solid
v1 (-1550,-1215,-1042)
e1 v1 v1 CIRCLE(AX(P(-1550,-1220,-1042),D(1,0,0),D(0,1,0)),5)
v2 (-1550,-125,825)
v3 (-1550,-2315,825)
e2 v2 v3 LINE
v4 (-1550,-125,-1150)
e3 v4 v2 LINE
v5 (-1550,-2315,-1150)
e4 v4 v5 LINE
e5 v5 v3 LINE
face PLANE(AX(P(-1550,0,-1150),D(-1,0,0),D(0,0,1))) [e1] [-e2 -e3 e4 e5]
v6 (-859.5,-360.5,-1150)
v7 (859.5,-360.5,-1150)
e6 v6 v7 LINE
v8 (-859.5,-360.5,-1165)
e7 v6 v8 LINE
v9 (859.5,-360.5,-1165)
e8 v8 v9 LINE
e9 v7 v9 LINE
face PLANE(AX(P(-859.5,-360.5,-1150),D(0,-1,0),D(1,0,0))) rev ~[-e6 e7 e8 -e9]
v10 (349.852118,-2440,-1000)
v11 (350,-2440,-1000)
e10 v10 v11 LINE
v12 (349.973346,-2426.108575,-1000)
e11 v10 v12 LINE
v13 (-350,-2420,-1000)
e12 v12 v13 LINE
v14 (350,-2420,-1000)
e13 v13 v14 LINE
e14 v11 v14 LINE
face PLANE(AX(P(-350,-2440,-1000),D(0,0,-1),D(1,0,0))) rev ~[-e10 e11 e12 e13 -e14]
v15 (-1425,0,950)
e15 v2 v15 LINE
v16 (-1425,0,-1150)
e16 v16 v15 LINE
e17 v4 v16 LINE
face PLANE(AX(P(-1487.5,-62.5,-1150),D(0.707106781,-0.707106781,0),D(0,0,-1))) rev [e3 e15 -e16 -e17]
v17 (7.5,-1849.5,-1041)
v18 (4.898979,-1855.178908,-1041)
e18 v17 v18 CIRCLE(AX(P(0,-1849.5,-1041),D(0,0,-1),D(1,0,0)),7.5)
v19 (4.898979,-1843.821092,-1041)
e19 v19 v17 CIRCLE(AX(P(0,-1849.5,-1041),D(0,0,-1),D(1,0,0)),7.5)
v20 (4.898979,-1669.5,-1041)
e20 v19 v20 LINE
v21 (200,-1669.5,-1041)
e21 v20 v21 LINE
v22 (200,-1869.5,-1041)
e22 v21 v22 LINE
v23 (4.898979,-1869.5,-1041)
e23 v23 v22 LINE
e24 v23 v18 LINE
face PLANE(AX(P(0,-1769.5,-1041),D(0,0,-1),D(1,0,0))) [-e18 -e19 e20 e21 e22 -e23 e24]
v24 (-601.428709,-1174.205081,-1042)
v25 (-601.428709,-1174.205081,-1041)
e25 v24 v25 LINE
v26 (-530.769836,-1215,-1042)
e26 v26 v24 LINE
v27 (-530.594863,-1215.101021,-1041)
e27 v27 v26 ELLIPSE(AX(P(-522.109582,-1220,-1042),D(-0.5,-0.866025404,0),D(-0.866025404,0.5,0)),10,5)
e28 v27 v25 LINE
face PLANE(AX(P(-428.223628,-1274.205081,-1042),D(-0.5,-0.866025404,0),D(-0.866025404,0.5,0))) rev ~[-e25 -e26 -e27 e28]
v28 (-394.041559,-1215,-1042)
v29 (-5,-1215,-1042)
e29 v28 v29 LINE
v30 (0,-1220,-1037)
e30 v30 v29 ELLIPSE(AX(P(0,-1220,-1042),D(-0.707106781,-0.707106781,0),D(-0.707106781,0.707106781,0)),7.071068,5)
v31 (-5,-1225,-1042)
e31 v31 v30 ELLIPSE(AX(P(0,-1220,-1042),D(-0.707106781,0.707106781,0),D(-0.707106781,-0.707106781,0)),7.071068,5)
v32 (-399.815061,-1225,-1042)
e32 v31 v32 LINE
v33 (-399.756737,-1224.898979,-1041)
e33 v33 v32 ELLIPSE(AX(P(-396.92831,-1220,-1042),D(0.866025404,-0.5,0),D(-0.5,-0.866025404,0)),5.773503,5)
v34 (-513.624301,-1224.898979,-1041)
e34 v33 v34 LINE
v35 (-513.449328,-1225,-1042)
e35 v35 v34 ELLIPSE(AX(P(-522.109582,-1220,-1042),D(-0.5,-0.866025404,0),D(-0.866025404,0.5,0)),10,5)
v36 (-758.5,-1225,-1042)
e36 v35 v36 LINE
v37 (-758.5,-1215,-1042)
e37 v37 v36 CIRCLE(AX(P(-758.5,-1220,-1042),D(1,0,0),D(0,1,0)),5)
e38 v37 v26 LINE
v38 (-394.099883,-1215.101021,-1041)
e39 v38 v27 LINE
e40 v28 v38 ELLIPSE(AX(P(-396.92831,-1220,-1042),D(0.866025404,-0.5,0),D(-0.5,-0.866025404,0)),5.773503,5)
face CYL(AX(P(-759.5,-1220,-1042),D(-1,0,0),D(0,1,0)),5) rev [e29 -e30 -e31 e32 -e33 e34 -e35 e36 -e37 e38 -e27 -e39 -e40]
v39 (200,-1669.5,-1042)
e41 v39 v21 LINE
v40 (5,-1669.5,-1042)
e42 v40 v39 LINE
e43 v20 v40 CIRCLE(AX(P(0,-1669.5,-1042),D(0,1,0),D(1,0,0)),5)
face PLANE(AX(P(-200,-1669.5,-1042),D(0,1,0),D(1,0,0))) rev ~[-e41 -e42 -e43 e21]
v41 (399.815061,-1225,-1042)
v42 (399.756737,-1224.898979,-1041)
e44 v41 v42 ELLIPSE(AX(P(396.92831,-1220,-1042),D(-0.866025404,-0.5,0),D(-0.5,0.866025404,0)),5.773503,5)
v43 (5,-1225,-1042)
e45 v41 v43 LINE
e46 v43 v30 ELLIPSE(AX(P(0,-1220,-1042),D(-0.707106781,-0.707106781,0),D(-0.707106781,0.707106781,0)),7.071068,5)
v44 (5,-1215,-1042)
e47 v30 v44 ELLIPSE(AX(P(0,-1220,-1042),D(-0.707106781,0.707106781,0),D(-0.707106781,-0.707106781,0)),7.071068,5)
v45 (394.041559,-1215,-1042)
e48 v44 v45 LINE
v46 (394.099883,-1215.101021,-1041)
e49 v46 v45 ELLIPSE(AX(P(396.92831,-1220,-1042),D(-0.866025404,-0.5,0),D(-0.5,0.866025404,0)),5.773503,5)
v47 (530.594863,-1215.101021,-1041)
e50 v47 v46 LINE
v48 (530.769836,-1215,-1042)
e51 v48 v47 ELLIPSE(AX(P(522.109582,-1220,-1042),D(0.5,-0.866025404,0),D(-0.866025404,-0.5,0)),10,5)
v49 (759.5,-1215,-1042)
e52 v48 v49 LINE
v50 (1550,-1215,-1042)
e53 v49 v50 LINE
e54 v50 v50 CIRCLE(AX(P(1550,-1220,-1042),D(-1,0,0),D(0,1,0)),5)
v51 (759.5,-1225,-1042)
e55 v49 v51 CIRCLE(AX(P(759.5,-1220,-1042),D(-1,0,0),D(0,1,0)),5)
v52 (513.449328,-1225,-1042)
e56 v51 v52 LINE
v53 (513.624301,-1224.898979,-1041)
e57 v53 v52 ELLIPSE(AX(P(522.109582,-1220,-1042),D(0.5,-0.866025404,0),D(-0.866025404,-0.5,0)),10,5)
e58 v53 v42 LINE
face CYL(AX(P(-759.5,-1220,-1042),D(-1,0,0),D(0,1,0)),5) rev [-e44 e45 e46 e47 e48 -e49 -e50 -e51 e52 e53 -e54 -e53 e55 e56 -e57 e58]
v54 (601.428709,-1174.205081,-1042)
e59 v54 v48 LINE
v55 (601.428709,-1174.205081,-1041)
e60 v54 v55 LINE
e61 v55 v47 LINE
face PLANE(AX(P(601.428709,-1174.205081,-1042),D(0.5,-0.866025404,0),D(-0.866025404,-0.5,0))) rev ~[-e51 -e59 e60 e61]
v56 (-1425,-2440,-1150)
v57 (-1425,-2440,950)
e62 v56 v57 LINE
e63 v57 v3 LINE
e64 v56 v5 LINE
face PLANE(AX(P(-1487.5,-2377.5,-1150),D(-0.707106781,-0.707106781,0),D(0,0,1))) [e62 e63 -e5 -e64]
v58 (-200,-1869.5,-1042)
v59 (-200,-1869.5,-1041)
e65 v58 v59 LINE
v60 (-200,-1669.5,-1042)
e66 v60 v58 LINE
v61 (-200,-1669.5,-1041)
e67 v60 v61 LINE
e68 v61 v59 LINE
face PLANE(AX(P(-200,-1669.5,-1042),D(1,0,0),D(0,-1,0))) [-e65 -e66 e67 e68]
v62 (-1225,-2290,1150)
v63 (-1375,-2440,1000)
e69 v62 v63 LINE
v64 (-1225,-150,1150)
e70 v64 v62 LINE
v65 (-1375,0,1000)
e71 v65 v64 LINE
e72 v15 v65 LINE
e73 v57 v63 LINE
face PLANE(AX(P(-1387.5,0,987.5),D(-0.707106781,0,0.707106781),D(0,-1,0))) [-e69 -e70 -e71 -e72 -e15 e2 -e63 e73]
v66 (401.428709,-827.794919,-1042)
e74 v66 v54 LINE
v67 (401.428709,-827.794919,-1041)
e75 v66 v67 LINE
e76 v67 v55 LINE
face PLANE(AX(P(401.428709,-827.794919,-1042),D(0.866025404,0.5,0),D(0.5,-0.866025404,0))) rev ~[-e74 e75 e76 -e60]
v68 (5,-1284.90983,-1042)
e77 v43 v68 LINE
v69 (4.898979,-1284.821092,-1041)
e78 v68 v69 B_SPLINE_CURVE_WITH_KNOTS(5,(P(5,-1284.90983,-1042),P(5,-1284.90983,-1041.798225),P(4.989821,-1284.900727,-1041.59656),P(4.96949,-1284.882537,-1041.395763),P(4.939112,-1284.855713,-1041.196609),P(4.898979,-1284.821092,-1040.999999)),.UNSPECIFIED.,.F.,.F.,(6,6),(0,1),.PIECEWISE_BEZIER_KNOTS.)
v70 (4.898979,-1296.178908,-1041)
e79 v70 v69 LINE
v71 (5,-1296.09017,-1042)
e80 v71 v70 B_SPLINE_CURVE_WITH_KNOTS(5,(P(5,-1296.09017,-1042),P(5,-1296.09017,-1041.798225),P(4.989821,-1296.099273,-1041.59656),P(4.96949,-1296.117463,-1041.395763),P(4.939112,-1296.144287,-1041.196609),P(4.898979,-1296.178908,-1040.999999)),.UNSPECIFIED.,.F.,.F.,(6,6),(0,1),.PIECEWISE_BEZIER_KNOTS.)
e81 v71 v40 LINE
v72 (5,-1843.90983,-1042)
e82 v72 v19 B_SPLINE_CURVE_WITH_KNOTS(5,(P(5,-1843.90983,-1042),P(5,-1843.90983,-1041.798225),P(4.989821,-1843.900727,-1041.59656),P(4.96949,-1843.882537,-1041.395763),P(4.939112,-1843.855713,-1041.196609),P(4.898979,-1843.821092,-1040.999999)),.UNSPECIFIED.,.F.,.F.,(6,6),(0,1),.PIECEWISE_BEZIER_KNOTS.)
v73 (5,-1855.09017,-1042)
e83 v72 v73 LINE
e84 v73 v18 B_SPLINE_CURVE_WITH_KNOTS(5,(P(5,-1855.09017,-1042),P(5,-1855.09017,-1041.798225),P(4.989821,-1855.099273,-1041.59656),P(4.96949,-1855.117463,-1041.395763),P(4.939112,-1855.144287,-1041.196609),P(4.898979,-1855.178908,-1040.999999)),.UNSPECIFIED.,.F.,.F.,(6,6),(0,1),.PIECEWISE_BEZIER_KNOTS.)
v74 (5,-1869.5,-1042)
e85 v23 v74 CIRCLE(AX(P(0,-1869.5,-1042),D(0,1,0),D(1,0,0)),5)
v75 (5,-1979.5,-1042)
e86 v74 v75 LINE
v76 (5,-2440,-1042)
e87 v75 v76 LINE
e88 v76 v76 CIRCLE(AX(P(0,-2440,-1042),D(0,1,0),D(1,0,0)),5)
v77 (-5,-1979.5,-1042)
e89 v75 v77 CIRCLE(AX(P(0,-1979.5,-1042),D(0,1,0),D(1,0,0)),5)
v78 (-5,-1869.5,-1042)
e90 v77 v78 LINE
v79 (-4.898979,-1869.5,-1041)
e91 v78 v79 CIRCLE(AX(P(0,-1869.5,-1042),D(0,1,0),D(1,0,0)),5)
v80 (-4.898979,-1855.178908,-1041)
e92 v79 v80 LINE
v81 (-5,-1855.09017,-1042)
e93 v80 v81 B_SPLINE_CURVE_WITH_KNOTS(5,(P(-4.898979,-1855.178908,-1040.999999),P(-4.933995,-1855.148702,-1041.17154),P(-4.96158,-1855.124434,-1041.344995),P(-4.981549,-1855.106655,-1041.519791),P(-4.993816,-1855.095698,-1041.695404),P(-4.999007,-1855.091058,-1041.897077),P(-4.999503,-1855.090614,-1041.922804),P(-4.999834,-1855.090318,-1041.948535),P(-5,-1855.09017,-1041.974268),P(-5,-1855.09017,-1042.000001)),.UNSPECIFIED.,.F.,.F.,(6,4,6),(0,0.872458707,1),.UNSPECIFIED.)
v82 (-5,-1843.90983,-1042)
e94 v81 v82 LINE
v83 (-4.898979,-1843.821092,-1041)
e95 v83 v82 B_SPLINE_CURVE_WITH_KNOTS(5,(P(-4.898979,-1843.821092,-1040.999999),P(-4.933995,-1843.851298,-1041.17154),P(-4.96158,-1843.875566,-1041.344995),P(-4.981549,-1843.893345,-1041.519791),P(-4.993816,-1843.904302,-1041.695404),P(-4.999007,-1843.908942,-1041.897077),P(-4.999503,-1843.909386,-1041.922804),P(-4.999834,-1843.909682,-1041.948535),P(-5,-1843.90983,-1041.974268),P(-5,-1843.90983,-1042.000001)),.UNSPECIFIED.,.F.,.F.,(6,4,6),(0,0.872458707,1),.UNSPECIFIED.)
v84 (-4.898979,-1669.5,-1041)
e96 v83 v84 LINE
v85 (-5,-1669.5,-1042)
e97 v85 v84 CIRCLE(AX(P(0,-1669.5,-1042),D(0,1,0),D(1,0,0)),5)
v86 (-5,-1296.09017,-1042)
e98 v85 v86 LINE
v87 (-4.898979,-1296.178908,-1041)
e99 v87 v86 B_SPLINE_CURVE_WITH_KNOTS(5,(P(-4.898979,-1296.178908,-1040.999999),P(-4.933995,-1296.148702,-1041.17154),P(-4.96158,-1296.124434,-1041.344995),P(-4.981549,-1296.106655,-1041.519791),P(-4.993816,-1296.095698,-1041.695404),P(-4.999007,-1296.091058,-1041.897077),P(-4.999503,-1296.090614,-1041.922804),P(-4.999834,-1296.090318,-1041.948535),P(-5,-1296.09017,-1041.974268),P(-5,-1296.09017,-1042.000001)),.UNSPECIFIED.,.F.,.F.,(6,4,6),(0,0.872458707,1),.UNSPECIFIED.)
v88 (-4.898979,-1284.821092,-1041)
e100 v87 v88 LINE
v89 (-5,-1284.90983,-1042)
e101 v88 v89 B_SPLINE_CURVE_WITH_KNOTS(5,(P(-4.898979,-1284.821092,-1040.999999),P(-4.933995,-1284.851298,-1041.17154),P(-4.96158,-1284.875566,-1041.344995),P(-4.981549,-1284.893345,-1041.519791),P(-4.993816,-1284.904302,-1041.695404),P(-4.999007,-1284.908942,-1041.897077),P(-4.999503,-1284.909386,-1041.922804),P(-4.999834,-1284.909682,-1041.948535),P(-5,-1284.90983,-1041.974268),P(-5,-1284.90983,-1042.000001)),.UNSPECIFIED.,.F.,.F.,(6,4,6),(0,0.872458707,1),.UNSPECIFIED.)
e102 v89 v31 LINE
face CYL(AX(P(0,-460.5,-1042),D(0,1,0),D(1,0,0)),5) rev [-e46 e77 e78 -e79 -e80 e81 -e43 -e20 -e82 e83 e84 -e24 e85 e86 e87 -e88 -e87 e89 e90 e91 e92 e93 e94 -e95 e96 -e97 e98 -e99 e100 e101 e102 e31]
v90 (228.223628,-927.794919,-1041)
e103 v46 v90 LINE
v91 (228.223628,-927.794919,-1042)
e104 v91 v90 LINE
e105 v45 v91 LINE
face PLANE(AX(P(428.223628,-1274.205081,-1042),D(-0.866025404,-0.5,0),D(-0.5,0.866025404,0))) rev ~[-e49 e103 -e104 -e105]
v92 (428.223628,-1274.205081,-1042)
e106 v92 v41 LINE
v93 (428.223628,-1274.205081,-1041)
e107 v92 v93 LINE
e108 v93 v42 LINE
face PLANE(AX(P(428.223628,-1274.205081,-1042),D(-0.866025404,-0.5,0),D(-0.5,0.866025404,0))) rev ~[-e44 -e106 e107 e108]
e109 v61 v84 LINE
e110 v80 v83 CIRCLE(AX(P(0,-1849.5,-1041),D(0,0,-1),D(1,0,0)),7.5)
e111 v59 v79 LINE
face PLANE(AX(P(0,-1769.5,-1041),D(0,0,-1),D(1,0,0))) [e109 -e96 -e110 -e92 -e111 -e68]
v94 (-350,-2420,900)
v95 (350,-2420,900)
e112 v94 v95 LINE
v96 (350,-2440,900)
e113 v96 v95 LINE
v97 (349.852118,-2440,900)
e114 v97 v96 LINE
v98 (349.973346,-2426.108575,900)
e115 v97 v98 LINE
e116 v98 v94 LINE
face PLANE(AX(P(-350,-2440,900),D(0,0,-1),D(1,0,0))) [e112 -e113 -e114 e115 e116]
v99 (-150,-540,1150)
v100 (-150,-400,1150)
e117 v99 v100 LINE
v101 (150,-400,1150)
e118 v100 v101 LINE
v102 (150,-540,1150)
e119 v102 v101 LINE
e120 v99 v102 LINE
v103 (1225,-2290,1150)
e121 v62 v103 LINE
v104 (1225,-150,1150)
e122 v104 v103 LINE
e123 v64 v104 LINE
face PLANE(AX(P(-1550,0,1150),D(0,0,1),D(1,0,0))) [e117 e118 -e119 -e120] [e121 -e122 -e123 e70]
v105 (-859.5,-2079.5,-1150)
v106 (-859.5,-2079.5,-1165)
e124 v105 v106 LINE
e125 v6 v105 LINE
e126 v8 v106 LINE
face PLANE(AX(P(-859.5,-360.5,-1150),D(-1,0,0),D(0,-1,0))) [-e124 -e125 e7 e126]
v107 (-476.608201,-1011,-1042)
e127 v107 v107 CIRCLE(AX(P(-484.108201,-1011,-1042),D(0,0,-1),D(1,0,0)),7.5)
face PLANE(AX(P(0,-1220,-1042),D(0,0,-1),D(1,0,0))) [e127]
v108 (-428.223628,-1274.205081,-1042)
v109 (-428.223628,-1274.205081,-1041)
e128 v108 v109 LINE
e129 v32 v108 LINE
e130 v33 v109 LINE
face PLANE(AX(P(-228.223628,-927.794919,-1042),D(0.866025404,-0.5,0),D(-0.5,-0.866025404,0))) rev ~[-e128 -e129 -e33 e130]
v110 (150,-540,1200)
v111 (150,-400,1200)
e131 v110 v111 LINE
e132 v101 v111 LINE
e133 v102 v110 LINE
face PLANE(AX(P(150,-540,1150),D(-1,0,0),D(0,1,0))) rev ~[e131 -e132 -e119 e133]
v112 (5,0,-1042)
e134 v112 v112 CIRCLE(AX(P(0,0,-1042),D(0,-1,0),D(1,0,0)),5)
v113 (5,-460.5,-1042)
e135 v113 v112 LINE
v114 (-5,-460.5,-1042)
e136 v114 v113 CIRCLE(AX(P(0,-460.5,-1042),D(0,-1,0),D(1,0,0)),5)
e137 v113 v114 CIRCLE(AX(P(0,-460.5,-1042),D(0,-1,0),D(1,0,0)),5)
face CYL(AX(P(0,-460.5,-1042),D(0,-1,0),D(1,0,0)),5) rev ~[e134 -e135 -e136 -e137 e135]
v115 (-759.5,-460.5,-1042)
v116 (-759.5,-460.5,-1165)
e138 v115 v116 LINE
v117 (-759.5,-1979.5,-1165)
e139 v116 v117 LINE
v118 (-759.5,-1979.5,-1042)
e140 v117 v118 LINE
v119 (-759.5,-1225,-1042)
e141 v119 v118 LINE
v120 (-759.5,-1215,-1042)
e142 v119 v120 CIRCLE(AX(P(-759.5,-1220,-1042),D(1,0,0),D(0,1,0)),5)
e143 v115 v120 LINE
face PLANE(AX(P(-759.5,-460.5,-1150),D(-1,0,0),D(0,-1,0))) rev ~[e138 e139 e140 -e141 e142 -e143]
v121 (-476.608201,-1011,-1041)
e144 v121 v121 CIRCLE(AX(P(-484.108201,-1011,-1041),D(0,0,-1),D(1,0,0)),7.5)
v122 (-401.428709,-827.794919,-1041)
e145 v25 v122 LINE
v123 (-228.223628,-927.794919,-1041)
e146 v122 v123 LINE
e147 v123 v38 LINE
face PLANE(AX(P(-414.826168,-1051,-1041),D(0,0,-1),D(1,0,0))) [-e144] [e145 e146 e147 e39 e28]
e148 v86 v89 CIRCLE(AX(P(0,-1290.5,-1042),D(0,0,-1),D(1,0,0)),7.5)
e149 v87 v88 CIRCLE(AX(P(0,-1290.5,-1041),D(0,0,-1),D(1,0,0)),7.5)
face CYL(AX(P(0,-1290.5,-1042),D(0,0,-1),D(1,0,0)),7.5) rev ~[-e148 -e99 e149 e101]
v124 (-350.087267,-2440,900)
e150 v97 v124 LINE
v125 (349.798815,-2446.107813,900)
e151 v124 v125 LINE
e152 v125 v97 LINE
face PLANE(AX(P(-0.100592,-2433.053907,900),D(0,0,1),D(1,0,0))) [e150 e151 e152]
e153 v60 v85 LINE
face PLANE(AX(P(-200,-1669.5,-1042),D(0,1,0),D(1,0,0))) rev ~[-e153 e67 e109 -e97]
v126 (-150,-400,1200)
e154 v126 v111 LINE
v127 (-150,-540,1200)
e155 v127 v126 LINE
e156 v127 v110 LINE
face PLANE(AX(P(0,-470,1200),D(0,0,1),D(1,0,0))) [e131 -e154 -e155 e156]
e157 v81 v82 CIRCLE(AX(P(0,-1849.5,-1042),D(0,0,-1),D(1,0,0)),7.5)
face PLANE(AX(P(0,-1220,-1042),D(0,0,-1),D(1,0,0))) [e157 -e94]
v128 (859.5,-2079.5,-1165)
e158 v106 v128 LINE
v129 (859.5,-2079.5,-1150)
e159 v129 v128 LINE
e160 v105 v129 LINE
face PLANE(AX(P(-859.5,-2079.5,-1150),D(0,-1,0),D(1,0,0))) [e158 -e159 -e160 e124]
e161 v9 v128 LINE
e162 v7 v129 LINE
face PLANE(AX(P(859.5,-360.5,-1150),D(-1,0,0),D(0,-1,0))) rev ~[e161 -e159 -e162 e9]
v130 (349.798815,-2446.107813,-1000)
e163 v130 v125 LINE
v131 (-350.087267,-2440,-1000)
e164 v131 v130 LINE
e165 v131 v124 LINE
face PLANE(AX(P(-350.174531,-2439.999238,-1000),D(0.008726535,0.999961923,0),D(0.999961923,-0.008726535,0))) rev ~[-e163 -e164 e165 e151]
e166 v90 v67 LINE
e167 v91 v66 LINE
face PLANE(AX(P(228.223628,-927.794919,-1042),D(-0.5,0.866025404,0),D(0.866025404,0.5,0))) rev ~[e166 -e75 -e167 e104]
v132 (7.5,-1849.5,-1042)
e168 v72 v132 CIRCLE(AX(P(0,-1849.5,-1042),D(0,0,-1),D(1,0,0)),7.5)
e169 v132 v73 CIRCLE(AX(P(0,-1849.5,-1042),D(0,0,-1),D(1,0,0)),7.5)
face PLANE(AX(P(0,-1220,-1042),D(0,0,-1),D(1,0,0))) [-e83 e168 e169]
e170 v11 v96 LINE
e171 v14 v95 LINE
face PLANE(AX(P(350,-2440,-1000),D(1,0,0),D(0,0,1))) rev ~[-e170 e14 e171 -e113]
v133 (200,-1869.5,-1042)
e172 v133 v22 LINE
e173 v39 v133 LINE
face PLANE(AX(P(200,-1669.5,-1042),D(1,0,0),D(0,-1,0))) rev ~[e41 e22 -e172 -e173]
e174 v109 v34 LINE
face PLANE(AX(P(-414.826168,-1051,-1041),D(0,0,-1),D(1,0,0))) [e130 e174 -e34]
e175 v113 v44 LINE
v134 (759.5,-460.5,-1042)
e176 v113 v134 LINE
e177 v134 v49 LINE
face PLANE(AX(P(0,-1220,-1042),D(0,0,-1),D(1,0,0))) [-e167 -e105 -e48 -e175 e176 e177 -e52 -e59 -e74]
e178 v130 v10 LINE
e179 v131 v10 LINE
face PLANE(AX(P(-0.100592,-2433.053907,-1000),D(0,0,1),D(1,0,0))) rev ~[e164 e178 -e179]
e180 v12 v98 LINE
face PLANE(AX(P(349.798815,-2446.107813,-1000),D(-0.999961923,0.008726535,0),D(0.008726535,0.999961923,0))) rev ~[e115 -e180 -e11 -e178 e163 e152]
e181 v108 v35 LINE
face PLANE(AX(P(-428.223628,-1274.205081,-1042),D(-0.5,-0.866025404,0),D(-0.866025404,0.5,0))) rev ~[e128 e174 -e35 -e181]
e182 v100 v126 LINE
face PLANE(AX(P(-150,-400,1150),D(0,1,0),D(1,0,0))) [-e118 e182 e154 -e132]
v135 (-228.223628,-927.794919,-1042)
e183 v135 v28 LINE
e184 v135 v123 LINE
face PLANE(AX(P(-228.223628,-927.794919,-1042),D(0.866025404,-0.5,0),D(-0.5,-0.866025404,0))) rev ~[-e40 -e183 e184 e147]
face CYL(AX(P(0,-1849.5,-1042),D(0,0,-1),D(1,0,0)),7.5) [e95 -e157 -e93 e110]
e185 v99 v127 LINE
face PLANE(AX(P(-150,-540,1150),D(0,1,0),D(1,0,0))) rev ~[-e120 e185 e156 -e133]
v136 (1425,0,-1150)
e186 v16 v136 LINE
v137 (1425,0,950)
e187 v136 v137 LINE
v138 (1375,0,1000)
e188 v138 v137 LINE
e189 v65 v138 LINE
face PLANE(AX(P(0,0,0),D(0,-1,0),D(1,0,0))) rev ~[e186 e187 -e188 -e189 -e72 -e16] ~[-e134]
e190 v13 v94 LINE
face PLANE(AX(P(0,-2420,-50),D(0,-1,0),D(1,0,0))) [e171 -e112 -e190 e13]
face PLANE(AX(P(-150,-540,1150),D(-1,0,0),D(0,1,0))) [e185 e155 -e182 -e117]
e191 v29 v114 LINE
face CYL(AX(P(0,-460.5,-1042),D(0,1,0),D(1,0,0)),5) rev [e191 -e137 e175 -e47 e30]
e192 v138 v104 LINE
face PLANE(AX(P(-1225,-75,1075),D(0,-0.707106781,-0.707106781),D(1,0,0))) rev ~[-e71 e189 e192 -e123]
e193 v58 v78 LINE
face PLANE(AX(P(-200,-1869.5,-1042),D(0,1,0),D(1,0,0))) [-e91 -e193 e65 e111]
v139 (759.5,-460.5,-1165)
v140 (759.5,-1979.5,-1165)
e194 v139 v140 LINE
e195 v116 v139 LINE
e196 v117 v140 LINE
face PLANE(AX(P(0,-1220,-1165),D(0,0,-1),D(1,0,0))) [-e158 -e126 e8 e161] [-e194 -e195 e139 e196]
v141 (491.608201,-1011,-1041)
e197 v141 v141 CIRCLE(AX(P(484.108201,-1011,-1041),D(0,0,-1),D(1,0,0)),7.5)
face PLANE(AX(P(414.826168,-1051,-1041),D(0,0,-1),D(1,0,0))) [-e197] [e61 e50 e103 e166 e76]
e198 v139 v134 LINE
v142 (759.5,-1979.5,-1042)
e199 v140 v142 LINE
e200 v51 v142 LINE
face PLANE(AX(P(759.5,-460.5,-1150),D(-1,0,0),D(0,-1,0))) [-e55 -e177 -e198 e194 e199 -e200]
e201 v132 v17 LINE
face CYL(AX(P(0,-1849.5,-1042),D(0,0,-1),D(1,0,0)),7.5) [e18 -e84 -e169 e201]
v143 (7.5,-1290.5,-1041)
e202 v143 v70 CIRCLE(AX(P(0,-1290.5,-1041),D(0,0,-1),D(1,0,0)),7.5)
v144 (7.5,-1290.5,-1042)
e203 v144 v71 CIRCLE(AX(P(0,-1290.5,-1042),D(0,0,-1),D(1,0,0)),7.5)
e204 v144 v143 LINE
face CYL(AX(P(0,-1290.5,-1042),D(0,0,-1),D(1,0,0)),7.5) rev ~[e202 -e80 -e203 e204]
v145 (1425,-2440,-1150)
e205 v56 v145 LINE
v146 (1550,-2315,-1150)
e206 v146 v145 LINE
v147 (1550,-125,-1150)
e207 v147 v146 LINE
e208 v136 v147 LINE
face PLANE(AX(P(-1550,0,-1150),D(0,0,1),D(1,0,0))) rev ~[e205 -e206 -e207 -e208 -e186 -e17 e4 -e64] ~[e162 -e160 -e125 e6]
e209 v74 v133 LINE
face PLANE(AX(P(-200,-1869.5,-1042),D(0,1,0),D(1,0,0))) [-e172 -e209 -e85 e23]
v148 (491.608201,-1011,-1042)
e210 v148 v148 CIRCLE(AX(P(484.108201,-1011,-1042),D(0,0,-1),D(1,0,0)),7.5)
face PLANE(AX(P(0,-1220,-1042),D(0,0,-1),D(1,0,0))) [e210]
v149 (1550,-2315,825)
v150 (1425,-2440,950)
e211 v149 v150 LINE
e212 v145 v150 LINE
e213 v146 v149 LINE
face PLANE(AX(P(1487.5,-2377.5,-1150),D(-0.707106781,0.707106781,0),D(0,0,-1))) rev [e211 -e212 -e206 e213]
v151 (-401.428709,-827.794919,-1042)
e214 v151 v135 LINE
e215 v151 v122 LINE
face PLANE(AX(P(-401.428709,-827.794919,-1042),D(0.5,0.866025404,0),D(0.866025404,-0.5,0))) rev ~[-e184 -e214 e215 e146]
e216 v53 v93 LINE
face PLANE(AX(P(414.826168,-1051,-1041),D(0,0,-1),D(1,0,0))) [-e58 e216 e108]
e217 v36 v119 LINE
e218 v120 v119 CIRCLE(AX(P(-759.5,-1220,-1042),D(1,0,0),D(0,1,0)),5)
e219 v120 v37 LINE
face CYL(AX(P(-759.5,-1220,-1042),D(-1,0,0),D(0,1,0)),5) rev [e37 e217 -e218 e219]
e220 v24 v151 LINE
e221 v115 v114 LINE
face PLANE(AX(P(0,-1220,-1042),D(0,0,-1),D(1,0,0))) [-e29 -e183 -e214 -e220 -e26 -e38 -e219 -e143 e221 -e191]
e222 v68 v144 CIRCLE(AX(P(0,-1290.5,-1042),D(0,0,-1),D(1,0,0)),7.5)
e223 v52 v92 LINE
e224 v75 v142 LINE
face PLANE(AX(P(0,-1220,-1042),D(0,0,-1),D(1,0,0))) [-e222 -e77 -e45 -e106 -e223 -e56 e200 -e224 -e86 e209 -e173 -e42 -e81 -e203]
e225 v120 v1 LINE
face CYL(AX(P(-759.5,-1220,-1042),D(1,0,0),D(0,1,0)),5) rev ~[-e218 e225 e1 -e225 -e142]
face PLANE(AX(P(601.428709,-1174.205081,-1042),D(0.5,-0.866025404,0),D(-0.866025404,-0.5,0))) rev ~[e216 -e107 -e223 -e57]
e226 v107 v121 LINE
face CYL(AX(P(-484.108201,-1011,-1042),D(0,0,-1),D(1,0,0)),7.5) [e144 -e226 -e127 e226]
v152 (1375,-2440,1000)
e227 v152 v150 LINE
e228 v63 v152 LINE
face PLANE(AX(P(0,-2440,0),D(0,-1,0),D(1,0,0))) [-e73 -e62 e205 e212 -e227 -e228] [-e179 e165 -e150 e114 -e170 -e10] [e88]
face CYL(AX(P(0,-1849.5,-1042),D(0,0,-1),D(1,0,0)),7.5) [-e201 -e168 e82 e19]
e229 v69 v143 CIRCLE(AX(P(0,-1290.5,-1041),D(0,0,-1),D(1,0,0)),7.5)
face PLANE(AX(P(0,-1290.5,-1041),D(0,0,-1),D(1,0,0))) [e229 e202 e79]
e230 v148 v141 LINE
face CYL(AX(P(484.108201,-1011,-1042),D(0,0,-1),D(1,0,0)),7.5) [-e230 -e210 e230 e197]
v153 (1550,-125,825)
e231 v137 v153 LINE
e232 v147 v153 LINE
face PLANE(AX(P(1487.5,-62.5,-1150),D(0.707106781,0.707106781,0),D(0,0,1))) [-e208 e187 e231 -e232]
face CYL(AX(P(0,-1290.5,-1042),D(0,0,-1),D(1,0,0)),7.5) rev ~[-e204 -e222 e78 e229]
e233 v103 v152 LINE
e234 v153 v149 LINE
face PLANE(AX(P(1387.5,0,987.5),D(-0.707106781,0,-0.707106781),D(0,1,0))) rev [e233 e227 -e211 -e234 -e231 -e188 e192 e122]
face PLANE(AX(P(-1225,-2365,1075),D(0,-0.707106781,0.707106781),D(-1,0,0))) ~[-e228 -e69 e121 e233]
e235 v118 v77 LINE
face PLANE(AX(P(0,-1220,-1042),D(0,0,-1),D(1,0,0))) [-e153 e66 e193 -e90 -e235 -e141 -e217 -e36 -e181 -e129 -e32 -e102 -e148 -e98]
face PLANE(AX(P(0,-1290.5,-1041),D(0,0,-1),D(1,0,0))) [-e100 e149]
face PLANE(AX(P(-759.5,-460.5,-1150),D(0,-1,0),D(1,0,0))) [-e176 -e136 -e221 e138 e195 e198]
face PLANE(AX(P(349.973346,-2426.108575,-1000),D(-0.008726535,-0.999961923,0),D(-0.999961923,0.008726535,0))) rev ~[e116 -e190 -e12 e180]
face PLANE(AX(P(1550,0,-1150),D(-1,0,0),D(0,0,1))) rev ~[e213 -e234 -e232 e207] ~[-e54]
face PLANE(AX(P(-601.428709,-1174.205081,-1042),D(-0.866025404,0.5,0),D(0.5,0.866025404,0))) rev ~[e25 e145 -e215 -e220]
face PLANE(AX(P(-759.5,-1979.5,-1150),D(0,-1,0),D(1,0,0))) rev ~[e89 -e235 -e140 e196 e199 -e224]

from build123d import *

# Parameters (mm, degrees)
F0_W           = 3100
F0_H           = 2300
F1_DEPTH       = 2440
F2_SIZE        = 325
F3_SIZE        = 325
F4_SIZE        = 125
F5_SIZE        = 125
F6_SIZE        = 125
F7_SIZE        = 125
F8_W           = 1519
F8_H           = 1519
F9_DEPTH       = 108
F10_W          = 400
F10_H          = 200
F10_R          = 7.5
F11_DEPTH      = 1
F12_R          = 5
F13_DEPTH      = 1
F14_DEPTH      = 790.501
F14_DEPTH_BACK = 2309.501
F15_R          = 5
F16_DEPTH      = 460.501
F16_DEPTH_BACK = 1979.501
F17_SIZE       = 150
F18_SIZE       = 150
F19_W          = 1719
F19_H          = 1719
F19_W_2        = 1519
F19_H_2        = 1519
F20_DEPTH      = 15
F21_W          = 700
F21_H          = 1900
F22_DEPTH      = 20
F23_W          = 300
F23_H          = 140
F24_DEPTH      = 50
F26_DEPTH      = 1900


# Not quite as in the source:
# - a feature of the source that left no trace in its solid (it failed there, or was rolled back) is left out


with BuildPart() as f1:
    # F0 (on Front) → F1 (new body)
    with BuildSketch(Plane.XZ):
        Rectangle(F0_W, F0_H)
    extrude(amount=F1_DEPTH)

    # F2
    f2_edges = [f1.edges().sort_by_distance(p)[0] for p in [
        (-1550, -1220, 1150),
    ]]
    chamfer(f2_edges, length=F2_SIZE)

    # F3
    f3_edges = [f1.edges().sort_by_distance(p)[0] for p in [
        (1550, -1220, 1150),
    ]]
    chamfer(f3_edges, length=F3_SIZE)

    # F4
    f4_edges = [f1.edges().sort_by_distance(p)[0] for p in [
        (1550, -2440, -162.5),
    ]]
    chamfer(f4_edges, length=F4_SIZE)

    # F5
    f5_edges = [f1.edges().sort_by_distance(p)[0] for p in [
        (-1550, -2440, -162.5),
    ]]
    chamfer(f5_edges, length=F5_SIZE)

    # F6
    f6_edges = [f1.edges().sort_by_distance(p)[0] for p in [
        (-1550, 0, -162.5),
    ]]
    chamfer(f6_edges, length=F6_SIZE)

    # F7
    f7_edges = [f1.edges().sort_by_distance(p)[0] for p in [
        (1550, 0, -162.5),
    ]]
    chamfer(f7_edges, length=F7_SIZE)

    # F8 (on face) → F9 (cut)
    with BuildSketch(Plane(origin=(0, 0, -1150), x_dir=(1, 0, 0), z_dir=(0, 0, -1))):
        with Locations((0, 1220)):
            Rectangle(F8_W, F8_H)
    extrude(amount=-F9_DEPTH, mode=Mode.SUBTRACT)

    # F10 (on face) → F11 (cut)
    with BuildSketch(Plane(origin=(0, 0, -1042), x_dir=(1, 0, 0), z_dir=(0, 0, -1))):
        with Locations((0, 1769.5)):
            Rectangle(F10_W, F10_H)
        with Locations((0, 1849.5)):
            Circle(F10_R, mode=Mode.SUBTRACT)
        Polygon((601.4287087912, 1174.2050807569), (428.2236280343, 1274.2050807569), (228.2236280343, 927.7949192431), (401.4287087912, 827.7949192431), align=None)
        with Locations((484.1082007155, 1011)):
            Circle(F10_R, mode=Mode.SUBTRACT)
        Polygon((-228.2236280343, 927.7949192431), (-428.2236280343, 1274.2050807569), (-601.4287087912, 1174.2050807569), (-401.4287087912, 827.7949192431), align=None)
        with Locations((-484.1082007155, 1011)):
            Circle(F10_R, mode=Mode.SUBTRACT)
        with Locations((0, 1290.5)):
            Circle(F10_R)
    extrude(amount=-F11_DEPTH, mode=Mode.SUBTRACT)

    # F12 (on face) → F13 (cut)
    with BuildSketch(Plane.YZ.offset(-759.5)):
        with Locations((-1220, -1042)):
            Circle(F12_R)
    extrude(amount=F13_DEPTH, mode=Mode.SUBTRACT)

    # F12 (on face) → F14 (cut, two sides)
    with BuildSketch(Plane.YZ.offset(-759.5)) as f14_sk:
        with Locations((-1220, -1042)):
            Circle(F12_R)
    extrude(amount=-F14_DEPTH, mode=Mode.SUBTRACT)
    extrude(f14_sk.sketch, amount=F14_DEPTH_BACK, mode=Mode.SUBTRACT)

    # F15 (on face) → F16 (cut, two sides)
    with BuildSketch(Plane.XZ.offset(460.5)) as f16_sk:
        with Locations((0, -1042)):
            Circle(F15_R)
    extrude(amount=-F16_DEPTH, mode=Mode.SUBTRACT)
    extrude(f16_sk.sketch, amount=F16_DEPTH_BACK, mode=Mode.SUBTRACT)

    # F17
    f17_edges = [f1.edges().sort_by_distance(p)[0] for p in [
        (0, 0, 1150),
    ]]
    chamfer(f17_edges, length=F17_SIZE)

    # F18
    f18_edges = [f1.edges().sort_by_distance(p)[0] for p in [
        (0, -2440, 1150),
    ]]
    chamfer(f18_edges, length=F18_SIZE)

    # F19 (on face) → F20 (join)
    with BuildSketch(Plane(origin=(0, 0, -1150), x_dir=(1, 0, 0), z_dir=(0, 0, -1))):
        with Locations((0, 1220)):
            Rectangle(F19_W, F19_H)
        with Locations((0, 1220)):
            Rectangle(F19_W_2, F19_H_2, mode=Mode.SUBTRACT)
    extrude(amount=F20_DEPTH)

    # F21 (on face) → F22 (cut)
    with BuildSketch(Plane.XZ.offset(2440)):
        with Locations((0, -50)):
            Rectangle(F21_W, F21_H)
    extrude(amount=-F22_DEPTH, mode=Mode.SUBTRACT)

    # F23 (on face) → F24 (join)
    with BuildSketch(Plane.XY.offset(1150)):
        with Locations((0, -470)):
            Rectangle(F23_W, F23_H)
    extrude(amount=F24_DEPTH)

    # F25 (on face) → F26 (join)
    with BuildSketch(Plane.XY.offset(-1000)):
        Polygon((-350, -2420), (-350.17453071, -2439.9992384613), (349.798815435, -2446.1078133101), (349.9733461449, -2426.1085748489), align=None)
    extrude(amount=F26_DEPTH)


solid = f1.part
